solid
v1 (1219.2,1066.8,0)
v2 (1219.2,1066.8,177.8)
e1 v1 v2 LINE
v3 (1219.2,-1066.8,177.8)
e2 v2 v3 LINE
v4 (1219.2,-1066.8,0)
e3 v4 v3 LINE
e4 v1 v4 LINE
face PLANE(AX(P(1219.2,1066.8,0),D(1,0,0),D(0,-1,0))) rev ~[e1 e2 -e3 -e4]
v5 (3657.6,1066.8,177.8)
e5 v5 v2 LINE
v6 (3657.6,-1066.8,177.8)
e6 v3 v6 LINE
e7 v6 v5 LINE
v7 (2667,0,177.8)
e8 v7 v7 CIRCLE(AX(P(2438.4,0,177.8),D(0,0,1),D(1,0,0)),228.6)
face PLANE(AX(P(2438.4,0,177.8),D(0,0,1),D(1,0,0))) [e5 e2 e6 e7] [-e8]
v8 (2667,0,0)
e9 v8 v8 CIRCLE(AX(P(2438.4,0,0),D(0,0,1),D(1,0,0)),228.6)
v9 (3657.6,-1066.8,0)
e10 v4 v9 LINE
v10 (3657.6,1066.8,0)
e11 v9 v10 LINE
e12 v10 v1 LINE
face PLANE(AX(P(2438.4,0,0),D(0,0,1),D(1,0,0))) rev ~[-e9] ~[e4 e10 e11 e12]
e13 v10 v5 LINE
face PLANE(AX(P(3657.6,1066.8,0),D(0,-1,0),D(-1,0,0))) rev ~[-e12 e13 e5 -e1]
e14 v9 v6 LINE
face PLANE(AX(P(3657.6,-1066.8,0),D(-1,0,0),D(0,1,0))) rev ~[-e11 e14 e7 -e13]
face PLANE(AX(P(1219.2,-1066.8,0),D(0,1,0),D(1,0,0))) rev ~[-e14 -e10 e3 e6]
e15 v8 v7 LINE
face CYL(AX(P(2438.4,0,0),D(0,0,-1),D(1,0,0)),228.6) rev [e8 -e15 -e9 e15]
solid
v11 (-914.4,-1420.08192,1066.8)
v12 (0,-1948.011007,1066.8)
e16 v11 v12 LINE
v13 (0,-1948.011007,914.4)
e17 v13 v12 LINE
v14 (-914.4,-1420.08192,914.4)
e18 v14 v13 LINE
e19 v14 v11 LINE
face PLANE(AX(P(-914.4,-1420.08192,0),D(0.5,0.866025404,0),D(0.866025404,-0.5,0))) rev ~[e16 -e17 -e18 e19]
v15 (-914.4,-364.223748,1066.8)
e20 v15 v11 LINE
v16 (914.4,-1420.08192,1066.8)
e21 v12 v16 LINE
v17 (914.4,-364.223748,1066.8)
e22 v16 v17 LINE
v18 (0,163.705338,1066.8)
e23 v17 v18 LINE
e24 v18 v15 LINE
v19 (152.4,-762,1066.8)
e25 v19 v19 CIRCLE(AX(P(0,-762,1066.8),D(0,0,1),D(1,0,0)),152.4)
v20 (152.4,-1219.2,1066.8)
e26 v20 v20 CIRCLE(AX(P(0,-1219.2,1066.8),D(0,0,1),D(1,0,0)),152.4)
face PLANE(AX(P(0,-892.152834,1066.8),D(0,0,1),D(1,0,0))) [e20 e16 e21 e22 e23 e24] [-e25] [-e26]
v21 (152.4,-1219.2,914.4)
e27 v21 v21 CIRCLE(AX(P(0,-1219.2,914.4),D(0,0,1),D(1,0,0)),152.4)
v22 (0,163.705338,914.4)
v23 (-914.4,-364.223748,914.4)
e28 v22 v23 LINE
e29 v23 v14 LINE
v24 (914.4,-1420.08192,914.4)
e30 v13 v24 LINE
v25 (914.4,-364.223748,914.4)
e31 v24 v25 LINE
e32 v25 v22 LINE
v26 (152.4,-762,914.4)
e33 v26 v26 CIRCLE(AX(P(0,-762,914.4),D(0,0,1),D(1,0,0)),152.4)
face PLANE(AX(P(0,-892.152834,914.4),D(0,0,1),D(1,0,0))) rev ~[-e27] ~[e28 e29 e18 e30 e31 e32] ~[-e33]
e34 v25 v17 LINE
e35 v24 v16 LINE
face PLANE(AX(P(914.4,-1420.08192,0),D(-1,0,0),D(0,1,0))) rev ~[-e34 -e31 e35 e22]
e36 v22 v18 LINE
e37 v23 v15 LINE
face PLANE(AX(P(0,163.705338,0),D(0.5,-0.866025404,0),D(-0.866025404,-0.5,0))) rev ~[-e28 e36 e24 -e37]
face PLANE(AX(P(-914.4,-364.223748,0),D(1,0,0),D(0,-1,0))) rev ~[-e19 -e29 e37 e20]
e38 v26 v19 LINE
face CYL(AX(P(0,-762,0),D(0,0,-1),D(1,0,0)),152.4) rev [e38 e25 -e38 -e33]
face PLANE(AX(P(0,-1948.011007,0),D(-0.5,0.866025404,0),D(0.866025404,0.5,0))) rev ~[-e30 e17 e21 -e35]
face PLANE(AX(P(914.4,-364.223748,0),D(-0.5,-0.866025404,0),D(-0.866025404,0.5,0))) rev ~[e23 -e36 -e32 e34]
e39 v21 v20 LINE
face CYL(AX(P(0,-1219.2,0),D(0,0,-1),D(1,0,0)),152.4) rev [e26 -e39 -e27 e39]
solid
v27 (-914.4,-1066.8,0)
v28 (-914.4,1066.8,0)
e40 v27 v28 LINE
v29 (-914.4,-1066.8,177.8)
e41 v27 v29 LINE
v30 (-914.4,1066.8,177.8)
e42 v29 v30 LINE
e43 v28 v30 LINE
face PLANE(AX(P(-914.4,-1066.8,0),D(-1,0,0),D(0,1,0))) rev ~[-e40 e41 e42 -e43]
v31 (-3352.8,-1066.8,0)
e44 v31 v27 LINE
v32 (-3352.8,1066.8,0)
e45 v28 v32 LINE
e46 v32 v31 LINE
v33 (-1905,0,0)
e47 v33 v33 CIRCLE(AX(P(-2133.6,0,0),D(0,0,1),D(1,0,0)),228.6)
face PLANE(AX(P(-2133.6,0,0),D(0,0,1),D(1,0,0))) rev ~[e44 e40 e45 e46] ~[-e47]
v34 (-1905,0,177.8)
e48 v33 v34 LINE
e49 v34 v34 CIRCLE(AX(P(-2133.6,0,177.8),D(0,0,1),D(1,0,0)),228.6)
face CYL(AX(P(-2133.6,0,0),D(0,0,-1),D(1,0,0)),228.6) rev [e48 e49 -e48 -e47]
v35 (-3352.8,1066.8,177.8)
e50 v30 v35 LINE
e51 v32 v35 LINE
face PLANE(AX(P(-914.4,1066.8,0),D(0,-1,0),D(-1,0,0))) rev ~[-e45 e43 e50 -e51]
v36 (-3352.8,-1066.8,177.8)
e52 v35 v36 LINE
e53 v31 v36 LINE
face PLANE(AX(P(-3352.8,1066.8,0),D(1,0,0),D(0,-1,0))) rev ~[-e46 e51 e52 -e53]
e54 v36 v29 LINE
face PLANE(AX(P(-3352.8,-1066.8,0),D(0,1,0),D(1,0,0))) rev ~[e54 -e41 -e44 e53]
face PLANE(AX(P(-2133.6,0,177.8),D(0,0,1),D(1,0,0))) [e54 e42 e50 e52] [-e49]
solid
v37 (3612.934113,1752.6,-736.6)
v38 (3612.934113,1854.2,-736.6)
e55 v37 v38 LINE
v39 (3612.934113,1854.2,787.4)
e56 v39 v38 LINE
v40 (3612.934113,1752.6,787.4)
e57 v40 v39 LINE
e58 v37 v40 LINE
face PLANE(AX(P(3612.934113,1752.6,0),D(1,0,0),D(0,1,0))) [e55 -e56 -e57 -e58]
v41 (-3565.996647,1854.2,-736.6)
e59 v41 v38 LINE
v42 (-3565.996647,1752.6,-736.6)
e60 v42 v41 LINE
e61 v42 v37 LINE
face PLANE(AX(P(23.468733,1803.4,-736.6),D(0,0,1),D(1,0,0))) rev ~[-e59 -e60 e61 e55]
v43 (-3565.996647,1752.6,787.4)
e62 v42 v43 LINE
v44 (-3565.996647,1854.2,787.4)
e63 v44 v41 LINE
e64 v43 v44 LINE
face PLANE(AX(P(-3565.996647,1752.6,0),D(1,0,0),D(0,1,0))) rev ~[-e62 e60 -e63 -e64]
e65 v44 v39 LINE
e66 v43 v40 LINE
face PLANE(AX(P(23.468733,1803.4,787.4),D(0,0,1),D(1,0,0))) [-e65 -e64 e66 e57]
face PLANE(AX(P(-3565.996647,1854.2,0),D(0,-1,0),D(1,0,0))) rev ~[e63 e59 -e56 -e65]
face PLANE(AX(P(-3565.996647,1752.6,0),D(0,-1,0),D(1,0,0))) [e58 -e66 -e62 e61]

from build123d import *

# Parameters (mm, degrees)
F0_R          = 228.6
F0_W          = 545.1920032501
F0_H          = 1898.5517024994
F2_DEPTH      = 177.8
F0_W_2        = 1524
F0_H_2        = 711.2
F0_R_2        = 152.4
F4_DEPTH      = 1066.8
F5_DEPTH      = 914.4
F0_W_3        = 7178.9307594299
F0_H_3        = 101.6
F6_DEPTH      = 787.4
F6_DEPTH_BACK = 736.6


# Not quite as in the source:
# - the program builds the solid bodies; features that only make, move or delete a surface that nothing else refers to are left out


with BuildPart() as f2:
    # F0 (on Top) → F2 (new body)
    with BuildSketch(Plane.XY):
        Polygon((1219.2, 304.8), (1219.2, -484.2192232609), (1219.2, -997.4917173386), (1219.2, -1066.8), (3657.6, -1066.8), (3657.6, 1066.8), (1219.2, 1066.8), (1219.2, 914.4), align=None)
        with Locations((2438.4, 0)):
            Circle(F0_R, mode=Mode.SUBTRACT)
        with Locations((2988.1635904312, 5.0233006477)):
            Rectangle(F0_W, F0_H, mode=Mode.SUBTRACT)
        with Locations((2988.1635904312, 5.0233006477)):
            Rectangle(F0_W, F0_H)
    extrude(amount=F2_DEPTH)


with BuildPart() as f2b:
    # F0 (on Top) → F2, piece 2 (new body)
    with BuildSketch(Plane.XY):
        Polygon((-914.4, -1066.8), (-914.4, -364.223748142), (-914.4, 304.8), (-914.4, 914.4), (-914.4, 1066.8), (-3352.8, 1066.8), (-3352.8, -1066.8), align=None)
        with Locations((-2133.6, 0)):
            Circle(F0_R, mode=Mode.SUBTRACT)
        with Locations((-2186.1399059296, 679.8987394333)):
            Rectangle(F0_W_2, F0_H_2, mode=Mode.SUBTRACT)
        with Locations((-2186.1399059296, 679.8987394333)):
            Rectangle(F0_W_2, F0_H_2)
    extrude(amount=F2_DEPTH)


with BuildPart() as f4:
    # F0 (on Top) → F4 (new body)
    with BuildSketch(Plane.XY):
        Polygon((914.4, -364.223748142), (0, 163.705338005), (-914.4, -364.223748142), (-914.4, -1066.8), (-914.4, -1420.081920436), (0, -1948.011006583), (914.4, -1420.081920436), (914.4, -997.4917173386), (914.4, -484.2192232609), align=None)
        with Locations((0, -1219.2)):
            Circle(F0_R_2, mode=Mode.SUBTRACT)
        with Locations((0, -762)):
            Circle(F0_R_2, mode=Mode.SUBTRACT)
    extrude(amount=F4_DEPTH)

    # F0 (on Top) → F5 (cut)
    with BuildSketch(Plane.XY):
        Polygon((914.4, -364.223748142), (0, 163.705338005), (-914.4, -364.223748142), (-914.4, -1066.8), (-914.4, -1420.081920436), (0, -1948.011006583), (914.4, -1420.081920436), (914.4, -997.4917173386), (914.4, -484.2192232609), align=None)
        with Locations((0, -1219.2)):
            Circle(F0_R_2, mode=Mode.SUBTRACT)
        with Locations((0, -762)):
            Circle(F0_R_2, mode=Mode.SUBTRACT)
    extrude(amount=F5_DEPTH, mode=Mode.SUBTRACT)


with BuildPart() as f6:
    # F0 (on Top) → F6 (new body, two sides)
    with BuildSketch(Plane.XY) as f6_sk:
        with Locations((23.4687328339, 1803.4)):
            Rectangle(F0_W_3, F0_H_3)
    extrude(amount=F6_DEPTH)
    extrude(f6_sk.sketch, amount=-F6_DEPTH_BACK)


solid = Compound([f2.part, f2b.part, f4.part, f6.part])
